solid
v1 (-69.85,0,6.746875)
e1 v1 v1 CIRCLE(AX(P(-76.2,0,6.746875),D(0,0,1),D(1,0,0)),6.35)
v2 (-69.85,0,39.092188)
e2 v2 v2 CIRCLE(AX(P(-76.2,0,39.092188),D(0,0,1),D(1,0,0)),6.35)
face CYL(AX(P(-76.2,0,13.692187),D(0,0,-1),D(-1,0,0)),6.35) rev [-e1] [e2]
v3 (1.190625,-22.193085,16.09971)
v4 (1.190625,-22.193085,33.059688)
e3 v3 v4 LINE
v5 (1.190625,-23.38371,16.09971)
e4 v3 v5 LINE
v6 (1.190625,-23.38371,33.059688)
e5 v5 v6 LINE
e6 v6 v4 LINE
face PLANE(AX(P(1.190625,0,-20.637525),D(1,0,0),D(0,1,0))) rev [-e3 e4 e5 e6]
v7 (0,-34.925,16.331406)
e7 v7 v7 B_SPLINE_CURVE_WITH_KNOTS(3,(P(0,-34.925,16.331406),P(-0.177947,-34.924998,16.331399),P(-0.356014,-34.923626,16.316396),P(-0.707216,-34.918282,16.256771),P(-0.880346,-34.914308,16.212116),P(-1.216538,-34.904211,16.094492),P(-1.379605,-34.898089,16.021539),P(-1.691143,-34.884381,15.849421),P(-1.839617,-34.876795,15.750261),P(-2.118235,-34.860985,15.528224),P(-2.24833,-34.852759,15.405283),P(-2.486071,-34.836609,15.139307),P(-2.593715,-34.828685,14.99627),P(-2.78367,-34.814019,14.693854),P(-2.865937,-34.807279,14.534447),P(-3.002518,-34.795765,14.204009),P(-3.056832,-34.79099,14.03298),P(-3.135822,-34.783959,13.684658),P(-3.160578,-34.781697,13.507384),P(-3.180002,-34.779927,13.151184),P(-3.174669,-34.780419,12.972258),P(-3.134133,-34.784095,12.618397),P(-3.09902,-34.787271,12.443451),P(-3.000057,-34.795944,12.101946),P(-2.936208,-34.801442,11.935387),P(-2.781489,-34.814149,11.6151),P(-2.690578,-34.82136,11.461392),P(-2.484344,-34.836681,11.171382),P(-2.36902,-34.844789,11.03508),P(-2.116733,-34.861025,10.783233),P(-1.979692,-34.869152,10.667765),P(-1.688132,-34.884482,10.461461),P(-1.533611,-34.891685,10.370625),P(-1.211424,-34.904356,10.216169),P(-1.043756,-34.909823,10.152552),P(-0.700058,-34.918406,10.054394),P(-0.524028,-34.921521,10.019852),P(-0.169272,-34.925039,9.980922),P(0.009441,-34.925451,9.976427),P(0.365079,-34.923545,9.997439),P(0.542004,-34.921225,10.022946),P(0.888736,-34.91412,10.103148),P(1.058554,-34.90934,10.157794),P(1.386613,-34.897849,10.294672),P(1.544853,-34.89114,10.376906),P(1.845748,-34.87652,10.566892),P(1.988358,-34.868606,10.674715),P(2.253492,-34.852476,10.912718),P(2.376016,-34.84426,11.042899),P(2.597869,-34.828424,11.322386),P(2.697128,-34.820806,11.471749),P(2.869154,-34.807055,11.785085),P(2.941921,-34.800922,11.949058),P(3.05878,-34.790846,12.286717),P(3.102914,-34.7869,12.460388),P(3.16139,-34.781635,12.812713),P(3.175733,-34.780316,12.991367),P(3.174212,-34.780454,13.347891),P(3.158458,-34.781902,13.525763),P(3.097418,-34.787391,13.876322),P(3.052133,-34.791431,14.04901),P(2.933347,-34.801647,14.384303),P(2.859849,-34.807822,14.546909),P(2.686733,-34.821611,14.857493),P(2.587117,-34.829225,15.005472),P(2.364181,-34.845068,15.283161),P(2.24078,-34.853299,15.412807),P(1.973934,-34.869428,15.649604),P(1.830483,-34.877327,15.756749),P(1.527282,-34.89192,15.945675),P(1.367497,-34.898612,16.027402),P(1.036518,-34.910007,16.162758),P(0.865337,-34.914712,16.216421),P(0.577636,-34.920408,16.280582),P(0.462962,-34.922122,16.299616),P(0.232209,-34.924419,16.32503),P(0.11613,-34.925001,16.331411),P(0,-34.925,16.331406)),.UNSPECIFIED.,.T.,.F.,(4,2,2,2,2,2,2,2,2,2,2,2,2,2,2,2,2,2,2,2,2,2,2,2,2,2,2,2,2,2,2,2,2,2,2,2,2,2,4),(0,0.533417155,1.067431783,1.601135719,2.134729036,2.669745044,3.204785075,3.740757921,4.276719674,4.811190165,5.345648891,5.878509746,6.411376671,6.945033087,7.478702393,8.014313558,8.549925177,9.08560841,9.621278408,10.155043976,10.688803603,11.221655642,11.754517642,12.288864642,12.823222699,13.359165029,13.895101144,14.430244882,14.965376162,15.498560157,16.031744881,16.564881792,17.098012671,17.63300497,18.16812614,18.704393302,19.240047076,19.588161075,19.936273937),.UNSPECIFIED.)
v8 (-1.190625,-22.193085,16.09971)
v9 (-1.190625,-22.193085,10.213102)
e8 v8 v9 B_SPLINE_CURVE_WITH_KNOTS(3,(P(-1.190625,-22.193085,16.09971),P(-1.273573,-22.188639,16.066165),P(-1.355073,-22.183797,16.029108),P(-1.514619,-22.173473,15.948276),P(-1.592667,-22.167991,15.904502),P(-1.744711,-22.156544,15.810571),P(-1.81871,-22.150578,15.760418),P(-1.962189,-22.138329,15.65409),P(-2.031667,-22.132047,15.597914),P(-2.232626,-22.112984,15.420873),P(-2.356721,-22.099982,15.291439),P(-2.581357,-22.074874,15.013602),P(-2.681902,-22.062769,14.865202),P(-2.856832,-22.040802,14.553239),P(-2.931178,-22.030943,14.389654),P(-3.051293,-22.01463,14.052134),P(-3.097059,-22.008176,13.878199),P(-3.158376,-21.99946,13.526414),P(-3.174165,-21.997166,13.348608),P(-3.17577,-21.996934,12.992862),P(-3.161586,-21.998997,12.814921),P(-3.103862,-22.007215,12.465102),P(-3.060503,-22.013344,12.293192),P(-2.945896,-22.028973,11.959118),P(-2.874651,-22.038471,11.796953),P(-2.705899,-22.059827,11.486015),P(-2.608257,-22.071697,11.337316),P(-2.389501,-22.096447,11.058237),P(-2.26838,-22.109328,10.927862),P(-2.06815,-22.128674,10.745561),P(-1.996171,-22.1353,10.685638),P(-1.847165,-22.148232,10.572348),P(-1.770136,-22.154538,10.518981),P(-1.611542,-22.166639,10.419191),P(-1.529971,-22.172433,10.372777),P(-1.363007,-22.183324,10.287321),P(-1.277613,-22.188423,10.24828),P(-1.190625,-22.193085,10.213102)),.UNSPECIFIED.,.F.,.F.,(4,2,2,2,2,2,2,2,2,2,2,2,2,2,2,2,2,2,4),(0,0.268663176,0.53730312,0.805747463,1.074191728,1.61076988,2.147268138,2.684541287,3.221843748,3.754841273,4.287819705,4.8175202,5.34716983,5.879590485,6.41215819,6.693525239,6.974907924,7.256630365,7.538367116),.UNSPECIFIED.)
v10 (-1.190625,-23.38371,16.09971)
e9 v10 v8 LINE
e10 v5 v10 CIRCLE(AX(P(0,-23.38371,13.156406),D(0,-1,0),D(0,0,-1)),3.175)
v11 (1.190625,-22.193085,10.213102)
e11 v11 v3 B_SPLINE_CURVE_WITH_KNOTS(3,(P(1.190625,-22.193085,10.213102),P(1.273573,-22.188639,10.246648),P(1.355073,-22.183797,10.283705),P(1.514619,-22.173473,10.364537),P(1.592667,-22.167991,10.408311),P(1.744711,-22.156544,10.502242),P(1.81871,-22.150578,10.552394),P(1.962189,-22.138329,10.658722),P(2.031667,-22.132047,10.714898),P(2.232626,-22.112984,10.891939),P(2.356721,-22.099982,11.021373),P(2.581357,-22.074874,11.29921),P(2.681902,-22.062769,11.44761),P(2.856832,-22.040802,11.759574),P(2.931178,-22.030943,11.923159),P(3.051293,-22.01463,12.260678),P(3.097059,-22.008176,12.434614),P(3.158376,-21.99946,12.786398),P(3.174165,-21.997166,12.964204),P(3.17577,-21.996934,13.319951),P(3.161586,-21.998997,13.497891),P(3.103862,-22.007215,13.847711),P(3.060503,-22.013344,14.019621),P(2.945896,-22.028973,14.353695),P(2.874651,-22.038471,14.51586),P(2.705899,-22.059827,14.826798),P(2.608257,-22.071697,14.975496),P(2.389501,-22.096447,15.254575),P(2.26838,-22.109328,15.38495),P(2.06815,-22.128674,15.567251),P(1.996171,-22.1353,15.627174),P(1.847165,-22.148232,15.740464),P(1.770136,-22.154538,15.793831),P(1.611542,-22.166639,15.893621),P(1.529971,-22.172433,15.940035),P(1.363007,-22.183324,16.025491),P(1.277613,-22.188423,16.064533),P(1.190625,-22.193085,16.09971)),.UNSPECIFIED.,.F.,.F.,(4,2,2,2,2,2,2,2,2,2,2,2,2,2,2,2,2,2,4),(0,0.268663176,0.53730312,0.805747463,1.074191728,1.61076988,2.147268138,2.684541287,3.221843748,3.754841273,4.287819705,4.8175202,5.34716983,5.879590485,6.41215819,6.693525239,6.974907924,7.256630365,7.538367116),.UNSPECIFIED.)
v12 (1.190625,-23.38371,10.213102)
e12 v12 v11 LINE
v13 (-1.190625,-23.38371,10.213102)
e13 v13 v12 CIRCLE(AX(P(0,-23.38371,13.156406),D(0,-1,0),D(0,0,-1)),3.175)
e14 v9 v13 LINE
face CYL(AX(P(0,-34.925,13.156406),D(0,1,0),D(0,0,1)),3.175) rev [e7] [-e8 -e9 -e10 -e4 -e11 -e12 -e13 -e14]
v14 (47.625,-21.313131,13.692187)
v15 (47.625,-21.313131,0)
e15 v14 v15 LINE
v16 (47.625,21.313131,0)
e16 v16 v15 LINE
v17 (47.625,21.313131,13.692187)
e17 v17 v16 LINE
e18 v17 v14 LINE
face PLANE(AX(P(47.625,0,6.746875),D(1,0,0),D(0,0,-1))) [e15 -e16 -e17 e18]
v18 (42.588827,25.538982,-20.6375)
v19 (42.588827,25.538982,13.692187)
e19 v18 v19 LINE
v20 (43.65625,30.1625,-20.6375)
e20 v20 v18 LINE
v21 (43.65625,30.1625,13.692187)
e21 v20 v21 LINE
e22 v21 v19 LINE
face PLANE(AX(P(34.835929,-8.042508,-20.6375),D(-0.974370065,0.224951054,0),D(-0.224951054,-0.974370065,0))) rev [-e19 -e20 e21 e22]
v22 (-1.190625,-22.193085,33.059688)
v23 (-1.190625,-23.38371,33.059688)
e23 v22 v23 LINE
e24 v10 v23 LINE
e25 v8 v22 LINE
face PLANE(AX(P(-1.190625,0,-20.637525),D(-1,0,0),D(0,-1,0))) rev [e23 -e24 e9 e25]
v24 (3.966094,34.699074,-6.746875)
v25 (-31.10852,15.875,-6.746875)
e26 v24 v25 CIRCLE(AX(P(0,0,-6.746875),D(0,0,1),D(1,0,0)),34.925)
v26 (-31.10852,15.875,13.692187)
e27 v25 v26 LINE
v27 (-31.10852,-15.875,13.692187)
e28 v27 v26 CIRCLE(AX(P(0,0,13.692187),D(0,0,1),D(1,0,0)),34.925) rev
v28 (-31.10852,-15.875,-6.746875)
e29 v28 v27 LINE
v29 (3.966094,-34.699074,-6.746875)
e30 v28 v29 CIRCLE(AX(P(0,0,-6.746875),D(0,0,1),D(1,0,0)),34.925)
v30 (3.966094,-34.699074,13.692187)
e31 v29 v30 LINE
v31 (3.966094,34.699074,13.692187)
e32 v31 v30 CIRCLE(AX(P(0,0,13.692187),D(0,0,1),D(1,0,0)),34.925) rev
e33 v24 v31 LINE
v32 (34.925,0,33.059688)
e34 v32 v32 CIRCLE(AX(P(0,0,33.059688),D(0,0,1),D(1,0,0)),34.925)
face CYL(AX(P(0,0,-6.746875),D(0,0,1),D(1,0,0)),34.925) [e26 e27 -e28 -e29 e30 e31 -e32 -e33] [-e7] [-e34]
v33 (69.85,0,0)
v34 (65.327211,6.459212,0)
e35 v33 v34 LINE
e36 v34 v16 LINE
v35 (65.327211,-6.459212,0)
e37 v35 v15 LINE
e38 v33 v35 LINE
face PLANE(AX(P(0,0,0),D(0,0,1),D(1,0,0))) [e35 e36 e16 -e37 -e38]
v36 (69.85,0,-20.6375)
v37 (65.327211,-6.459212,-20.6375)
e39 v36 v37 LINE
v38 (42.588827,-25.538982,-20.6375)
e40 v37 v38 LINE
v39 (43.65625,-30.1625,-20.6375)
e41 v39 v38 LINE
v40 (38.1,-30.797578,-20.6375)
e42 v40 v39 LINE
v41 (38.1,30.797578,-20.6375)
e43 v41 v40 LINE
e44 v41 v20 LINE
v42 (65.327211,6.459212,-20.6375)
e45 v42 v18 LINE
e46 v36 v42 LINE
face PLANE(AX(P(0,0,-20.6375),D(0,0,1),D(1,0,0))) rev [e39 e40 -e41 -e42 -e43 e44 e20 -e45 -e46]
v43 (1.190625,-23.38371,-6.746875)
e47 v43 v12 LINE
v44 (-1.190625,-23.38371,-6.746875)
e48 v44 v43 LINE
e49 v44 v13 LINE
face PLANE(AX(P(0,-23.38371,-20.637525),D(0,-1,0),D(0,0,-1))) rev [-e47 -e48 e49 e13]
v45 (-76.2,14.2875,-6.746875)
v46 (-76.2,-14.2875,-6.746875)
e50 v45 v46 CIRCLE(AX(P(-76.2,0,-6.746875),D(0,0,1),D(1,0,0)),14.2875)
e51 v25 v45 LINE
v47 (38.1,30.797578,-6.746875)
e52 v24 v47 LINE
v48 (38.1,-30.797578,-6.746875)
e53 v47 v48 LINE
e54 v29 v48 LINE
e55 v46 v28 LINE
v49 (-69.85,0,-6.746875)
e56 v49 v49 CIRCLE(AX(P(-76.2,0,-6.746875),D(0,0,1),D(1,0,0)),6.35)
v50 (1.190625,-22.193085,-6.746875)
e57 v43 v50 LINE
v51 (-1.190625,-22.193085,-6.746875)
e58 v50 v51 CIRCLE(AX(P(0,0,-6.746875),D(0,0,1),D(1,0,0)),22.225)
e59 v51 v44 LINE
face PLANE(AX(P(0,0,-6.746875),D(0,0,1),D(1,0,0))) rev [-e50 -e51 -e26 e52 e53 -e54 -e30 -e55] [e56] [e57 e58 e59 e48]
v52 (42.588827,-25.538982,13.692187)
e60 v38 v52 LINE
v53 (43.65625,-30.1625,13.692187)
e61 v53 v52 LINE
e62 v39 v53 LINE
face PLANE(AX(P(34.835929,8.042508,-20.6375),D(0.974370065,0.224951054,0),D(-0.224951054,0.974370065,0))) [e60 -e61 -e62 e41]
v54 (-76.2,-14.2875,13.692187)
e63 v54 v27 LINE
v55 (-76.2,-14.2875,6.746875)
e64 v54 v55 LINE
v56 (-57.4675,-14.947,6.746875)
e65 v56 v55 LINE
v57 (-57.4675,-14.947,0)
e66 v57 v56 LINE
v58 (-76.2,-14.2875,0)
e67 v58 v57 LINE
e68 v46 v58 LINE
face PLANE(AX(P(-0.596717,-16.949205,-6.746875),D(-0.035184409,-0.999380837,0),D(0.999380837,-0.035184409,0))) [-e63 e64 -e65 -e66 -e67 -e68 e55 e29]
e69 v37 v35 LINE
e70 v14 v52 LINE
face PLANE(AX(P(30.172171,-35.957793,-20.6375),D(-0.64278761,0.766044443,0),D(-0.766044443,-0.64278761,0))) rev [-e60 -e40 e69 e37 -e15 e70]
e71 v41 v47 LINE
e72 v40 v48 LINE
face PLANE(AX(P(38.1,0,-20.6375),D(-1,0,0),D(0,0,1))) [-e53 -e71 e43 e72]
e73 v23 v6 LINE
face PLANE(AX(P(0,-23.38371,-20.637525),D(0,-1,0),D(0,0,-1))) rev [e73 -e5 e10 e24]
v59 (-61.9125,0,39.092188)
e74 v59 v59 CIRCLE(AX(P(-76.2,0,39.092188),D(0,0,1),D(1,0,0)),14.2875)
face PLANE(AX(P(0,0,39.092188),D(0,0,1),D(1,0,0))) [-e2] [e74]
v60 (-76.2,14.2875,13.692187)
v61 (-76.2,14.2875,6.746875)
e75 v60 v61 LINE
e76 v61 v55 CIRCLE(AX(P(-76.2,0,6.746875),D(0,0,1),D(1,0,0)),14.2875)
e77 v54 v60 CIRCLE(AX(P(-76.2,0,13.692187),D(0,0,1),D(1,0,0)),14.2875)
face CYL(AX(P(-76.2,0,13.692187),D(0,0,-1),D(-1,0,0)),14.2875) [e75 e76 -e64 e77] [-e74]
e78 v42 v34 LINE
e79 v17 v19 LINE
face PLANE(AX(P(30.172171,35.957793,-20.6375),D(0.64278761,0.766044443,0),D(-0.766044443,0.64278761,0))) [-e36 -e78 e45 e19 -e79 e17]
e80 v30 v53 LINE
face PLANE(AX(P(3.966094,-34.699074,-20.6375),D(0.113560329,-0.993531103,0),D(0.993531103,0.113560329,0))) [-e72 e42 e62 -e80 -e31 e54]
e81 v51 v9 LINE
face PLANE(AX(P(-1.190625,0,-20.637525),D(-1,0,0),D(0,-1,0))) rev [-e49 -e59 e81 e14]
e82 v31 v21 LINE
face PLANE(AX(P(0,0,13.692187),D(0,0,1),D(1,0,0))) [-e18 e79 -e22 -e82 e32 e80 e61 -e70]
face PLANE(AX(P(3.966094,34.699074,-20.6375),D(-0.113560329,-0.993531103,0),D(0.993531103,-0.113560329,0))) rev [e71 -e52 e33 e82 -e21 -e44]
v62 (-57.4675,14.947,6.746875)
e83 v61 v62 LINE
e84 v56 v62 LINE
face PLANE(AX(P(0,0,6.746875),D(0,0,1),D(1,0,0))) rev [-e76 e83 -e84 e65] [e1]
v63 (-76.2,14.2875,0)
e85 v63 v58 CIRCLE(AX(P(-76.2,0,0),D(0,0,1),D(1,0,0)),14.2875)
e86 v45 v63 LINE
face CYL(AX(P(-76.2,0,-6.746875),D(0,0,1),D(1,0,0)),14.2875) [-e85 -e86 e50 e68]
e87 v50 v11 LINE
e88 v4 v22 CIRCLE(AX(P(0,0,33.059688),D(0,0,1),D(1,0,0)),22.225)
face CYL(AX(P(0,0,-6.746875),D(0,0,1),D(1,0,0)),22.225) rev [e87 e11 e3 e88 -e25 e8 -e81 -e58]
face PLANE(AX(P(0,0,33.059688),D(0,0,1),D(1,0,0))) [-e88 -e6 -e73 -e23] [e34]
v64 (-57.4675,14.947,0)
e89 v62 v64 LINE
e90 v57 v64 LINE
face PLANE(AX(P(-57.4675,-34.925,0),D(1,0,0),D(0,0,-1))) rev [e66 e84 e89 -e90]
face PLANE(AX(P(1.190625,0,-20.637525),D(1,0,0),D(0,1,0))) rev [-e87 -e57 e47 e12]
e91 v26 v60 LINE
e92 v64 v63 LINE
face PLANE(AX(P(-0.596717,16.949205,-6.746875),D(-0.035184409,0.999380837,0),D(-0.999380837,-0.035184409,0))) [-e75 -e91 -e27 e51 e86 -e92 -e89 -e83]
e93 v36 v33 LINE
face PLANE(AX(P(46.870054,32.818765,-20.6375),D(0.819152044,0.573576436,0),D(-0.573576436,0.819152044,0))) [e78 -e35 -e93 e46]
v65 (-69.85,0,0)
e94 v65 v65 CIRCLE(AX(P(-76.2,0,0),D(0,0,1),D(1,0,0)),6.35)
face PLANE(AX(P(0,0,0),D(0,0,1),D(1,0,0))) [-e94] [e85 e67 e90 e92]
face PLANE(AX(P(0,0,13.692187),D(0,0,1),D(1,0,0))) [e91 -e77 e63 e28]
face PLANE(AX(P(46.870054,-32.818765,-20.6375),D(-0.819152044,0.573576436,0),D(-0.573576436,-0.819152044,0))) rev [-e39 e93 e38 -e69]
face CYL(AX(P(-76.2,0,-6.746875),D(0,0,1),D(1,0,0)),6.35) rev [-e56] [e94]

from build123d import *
from OCP.BRepAlgoAPI import BRepAlgoAPI_Cut
from OCP.TopTools import TopTools_ListOfShape

# Parameters (mm, degrees)
BOSS_EXTRUDE7_DEPTH     = 20.6375
SKETCH1_18_R            = 14.2875
SKETCH1_18_R_2          = 6.35
SKETCH1_18_R_3          = 34.925
SKETCH1_18_R_4          = 22.225
BOSS_EXTRUDE10_DEPTH    = 6.746875
BOSS_EXTRUDE11_START    = 6.746875
SKETCH1_20_R            = 34.925
SKETCH1_20_R_2          = 22.225
BOSS_EXTRUDE11_DEPTH    = 6.746875
BOSS_EXTRUDE12_START    = 13.692187
SKETCH1_21_R            = 14.2875
SKETCH1_21_R_2          = 6.35
SKETCH1_21_R_3          = 34.925
SKETCH1_21_R_4          = 22.225
BOSS_EXTRUDE12_DEPTH    = 6.945312
BOSS_EXTRUDE13_START    = 39.09219
SKETCH1_22_R            = 14.2875
SKETCH1_22_R_2          = 6.35
BOSS_EXTRUDE13_DEPTH    = 25.4
BOSS_EXTRUDE14_START    = 13.692187
SKETCH1_23_R            = 34.925
SKETCH1_23_R_2          = 22.225
BOSS_EXTRUDE14_DEPTH    = 19.367501
CUT_EXTRUDE3_DEPTH      = 111.865374
SKETCH5_R               = 3.175
CUT_EXTRUDE4_DEPTH      = 105.575057
CUT_EXTRUDE5_DEPTH      = 105.575057
CUT_EXTRUDE5_DEPTH_BACK = 105.575057
SKETCH6_W               = 33.02
SKETCH6_H               = 6.746875


with BuildPart() as part:
    # Sketch1 → Boss-Extrude7 (new body)
    with BuildSketch(Plane.XY):
        Polygon((38.1, 30.797578), (38.1, -30.797578), (43.65625, -30.1625), (42.588827, -25.538982), (65.327211, -6.459212), (69.85, 0), (65.327211, 6.459212), (42.588827, 25.538982), (43.65625, 30.1625), align=None)
    extrude(amount=-BOSS_EXTRUDE7_DEPTH)

    # Sketch1<18> → Boss-Extrude10 (add)
    # profile 1 of 5: a face of its own
    with BuildSketch(Plane.XY):
        with BuildLine():
            ThreePointArc((34.925, 0), (26.060233, -23.251234), (3.966094, -34.699074))
            Line((3.966094, -34.699074), (38.1, -30.797578))
            Line((38.1, -30.797578), (38.1, 30.797578))
            Line((38.1, 30.797578), (3.966094, 34.699074))
            ThreePointArc((3.966094, 34.699074), (26.060233, 23.251234), (34.925, 0))
        make_face()
    # profile 2 of 5: a face of its own
    with BuildSketch(Plane.XY):
        with BuildLine():
            Line((-55.5625, 15.014068), (-55.5625, -15.014068))
            Line((-55.5625, -15.014068), (-31.10852, -15.875))
            ThreePointArc((-31.10852, -15.875), (-34.925, 0), (-31.10852, 15.875))
            Line((-31.10852, 15.875), (-55.5625, 15.014068))
        make_face()
    # profile 3 of 5: a face of its own
    with BuildSketch(Plane.XY):
        with BuildLine():
            ThreePointArc((-61.9125, 0), (-66.097212, -10.102788), (-76.2, -14.2875))
            Line((-76.2, -14.2875), (-55.5625, -15.014068))
            Line((-55.5625, -15.014068), (-55.5625, 15.014068))
            Line((-55.5625, 15.014068), (-76.2, 14.2875))
            ThreePointArc((-76.2, 14.2875), (-66.097212, 10.102788), (-61.9125, 0))
        make_face()
    # profile 4 of 5: a face of its own
    with BuildSketch(Plane.XY):
        with Locations((-76.2, 0)):
            Circle(SKETCH1_18_R)
        with Locations((-76.2, 0)):
            Circle(SKETCH1_18_R_2, mode=Mode.SUBTRACT)
    # profile 5 of 5: a face of its own
    with BuildSketch(Plane.XY):
        Circle(SKETCH1_18_R_3)
        Circle(SKETCH1_18_R_4, mode=Mode.SUBTRACT)
    extrude(amount=-BOSS_EXTRUDE10_DEPTH)

    # Sketch1<20> → Boss-Extrude11 (add)
    # profile 1 of 5: a face of its own
    with BuildSketch(Plane.XY.offset(BOSS_EXTRUDE11_START)):
        Circle(SKETCH1_20_R)
        Circle(SKETCH1_20_R_2, mode=Mode.SUBTRACT)
    # profile 2 of 5: a face of its own
    with BuildSketch(Plane.XY.offset(BOSS_EXTRUDE11_START)):
        with BuildLine():
            ThreePointArc((34.925, 0), (26.060233, -23.251234), (3.966094, -34.699074))
            Line((3.966094, -34.699074), (38.1, -30.797578))
            Line((38.1, -30.797578), (38.1, 30.797578))
            Line((38.1, 30.797578), (3.966094, 34.699074))
            ThreePointArc((3.966094, 34.699074), (26.060233, 23.251234), (34.925, 0))
        make_face()
    # profile 3 of 5: a face of its own
    with BuildSketch(Plane.XY.offset(BOSS_EXTRUDE11_START)):
        Polygon((38.1, 30.797578), (38.1, -30.797578), (43.65625, -30.1625), (42.588827, -25.538982), (47.625, -21.313131), (47.625, 21.313131), (42.588827, 25.538982), (43.65625, 30.1625), align=None)
    # profile 4 of 5: a face of its own
    with BuildSketch(Plane.XY.offset(BOSS_EXTRUDE11_START)):
        with BuildLine():
            Line((-55.5625, 15.014068), (-55.5625, -15.014068))
            Line((-55.5625, -15.014068), (-31.10852, -15.875))
            ThreePointArc((-31.10852, -15.875), (-34.925, 0), (-31.10852, 15.875))
            Line((-31.10852, 15.875), (-55.5625, 15.014068))
        make_face()
    # profile 5 of 5: a face of its own
    with BuildSketch(Plane.XY.offset(BOSS_EXTRUDE11_START)):
        with BuildLine():
            ThreePointArc((-61.9125, 0), (-66.097212, -10.102788), (-76.2, -14.2875))
            Line((-76.2, -14.2875), (-55.5625, -15.014068))
            Line((-55.5625, -15.014068), (-55.5625, 15.014068))
            Line((-55.5625, 15.014068), (-76.2, 14.2875))
            ThreePointArc((-76.2, 14.2875), (-66.097212, 10.102788), (-61.9125, 0))
        make_face()
    extrude(amount=-BOSS_EXTRUDE11_DEPTH)

    # Sketch1<21> → Boss-Extrude12 (add)
    # profile 1 of 6: a face of its own
    with BuildSketch(Plane.XY.offset(BOSS_EXTRUDE12_START)):
        with Locations((-76.2, 0)):
            Circle(SKETCH1_21_R)
        with Locations((-76.2, 0)):
            Circle(SKETCH1_21_R_2, mode=Mode.SUBTRACT)
    # profile 2 of 6: a face of its own
    with BuildSketch(Plane.XY.offset(BOSS_EXTRUDE12_START)):
        with BuildLine():
            ThreePointArc((-61.9125, 0), (-66.097212, -10.102788), (-76.2, -14.2875))
            Line((-76.2, -14.2875), (-55.5625, -15.014068))
            Line((-55.5625, -15.014068), (-55.5625, 15.014068))
            Line((-55.5625, 15.014068), (-76.2, 14.2875))
            ThreePointArc((-76.2, 14.2875), (-66.097212, 10.102788), (-61.9125, 0))
        make_face()
    # profile 3 of 6: a face of its own
    with BuildSketch(Plane.XY.offset(BOSS_EXTRUDE12_START)):
        with BuildLine():
            Line((-55.5625, 15.014068), (-55.5625, -15.014068))
            Line((-55.5625, -15.014068), (-31.10852, -15.875))
            ThreePointArc((-31.10852, -15.875), (-34.925, 0), (-31.10852, 15.875))
            Line((-31.10852, 15.875), (-55.5625, 15.014068))
        make_face()
    # profile 4 of 6: a face of its own
    with BuildSketch(Plane.XY.offset(BOSS_EXTRUDE12_START)):
        Circle(SKETCH1_21_R_3)
        Circle(SKETCH1_21_R_4, mode=Mode.SUBTRACT)
    # profile 5 of 6: a face of its own
    with BuildSketch(Plane.XY.offset(BOSS_EXTRUDE12_START)):
        with BuildLine():
            ThreePointArc((34.925, 0), (26.060233, -23.251234), (3.966094, -34.699074))
            Line((3.966094, -34.699074), (38.1, -30.797578))
            Line((38.1, -30.797578), (38.1, 30.797578))
            Line((38.1, 30.797578), (3.966094, 34.699074))
            ThreePointArc((3.966094, 34.699074), (26.060233, 23.251234), (34.925, 0))
        make_face()
    # profile 6 of 6: a face of its own
    with BuildSketch(Plane.XY.offset(BOSS_EXTRUDE12_START)):
        Polygon((38.1, 30.797578), (38.1, -30.797578), (43.65625, -30.1625), (42.588827, -25.538982), (47.625, -21.313131), (47.625, 21.313131), (42.588827, 25.538982), (43.65625, 30.1625), align=None)
    extrude(amount=-BOSS_EXTRUDE12_DEPTH)


with BuildPart() as boss_extrude13_tool:
    # Sketch1<22> → Boss-Extrude13 (new body)
    with BuildSketch(Plane.XY.offset(BOSS_EXTRUDE13_START)):
        with Locations(Location((-76.2, 0, 0), (0, 0, 270))):
            Circle(SKETCH1_22_R)
        with Locations((-76.2, 0)):
            Circle(SKETCH1_22_R_2, mode=Mode.SUBTRACT)
    extrude(amount=-BOSS_EXTRUDE13_DEPTH)


with BuildPart() as part_1:
    add(part.part)


with BuildPart() as part_2:
    # Boss-Extrude13: joined with boss_extrude13_tool
    add(part_1.part.fuse(boss_extrude13_tool.part, tol=0.00001))

    # Sketch1<23> → Boss-Extrude14 (add)
    with BuildSketch(Plane.XY.offset(BOSS_EXTRUDE14_START)):
        Circle(SKETCH1_23_R)
        Circle(SKETCH1_23_R_2, mode=Mode.SUBTRACT)
    extrude(amount=BOSS_EXTRUDE14_DEPTH)


with BuildPart() as cut_extrude3_tool:
    # Sketch4 → Cut-Extrude3 (new, through all)
    with BuildSketch(Plane.XY.offset(33.059687)):
        with BuildLine():
            Line((0, -23.38371), (0, -22.225))
            ThreePointArc((0, -22.225), (-0.595526, -22.21702), (-1.190625, -22.193085))
            Line((-1.190625, -22.193085), (-1.190625, -23.38371))
            Line((-1.190625, -23.38371), (0, -23.38371))
        make_face()
        with BuildLine():
            ThreePointArc((1.190625, -22.193085), (0.595526, -22.21702), (0, -22.225))
            Line((0, -22.225), (0, -23.38371))
            Line((0, -23.38371), (1.190625, -23.38371))
            Line((1.190625, -23.38371), (1.190625, -22.193085))
        make_face()
    extrude(amount=-CUT_EXTRUDE3_DEPTH)


with BuildPart() as part_3:
    add(part_2.part)

    # Cut-Extrude3: cut by cut_extrude3_tool, with a tolerance
    cut_extrude3_stock = TopTools_ListOfShape()
    cut_extrude3_stock.Append(part_3.part.wrapped)
    cut_extrude3_tools = TopTools_ListOfShape()
    cut_extrude3_tools.Append(cut_extrude3_tool.part.wrapped)
    cut_extrude3_cut = BRepAlgoAPI_Cut()
    cut_extrude3_cut.SetArguments(cut_extrude3_stock)
    cut_extrude3_cut.SetTools(cut_extrude3_tools)
    cut_extrude3_cut.SetFuzzyValue(0.00001)
    cut_extrude3_cut.Build()
    add(Compound.cast(cut_extrude3_cut.Shape()).solids(), mode=Mode.REPLACE)

    # Sketch5 → Cut-Extrude4 (cut, through all)
    with BuildSketch(Plane(origin=(0, 0, 0), x_dir=(1, 0, 0), z_dir=(0, 1, 0))):
        with Locations(Location((0, -13.156406, 0), (0, 0, 270))):
            Circle(SKETCH5_R)
    extrude(amount=-CUT_EXTRUDE4_DEPTH, mode=Mode.SUBTRACT)

    # Sketch6 → Cut-Extrude5 (cut, two sides: drawn at the far end of the back side and taken through both)
    with BuildSketch(Plane(origin=(0, 0, 0), x_dir=(1, 0, 0), z_dir=(0, 1, 0)).offset(-CUT_EXTRUDE5_DEPTH_BACK)):
        with Locations((-73.9775, -3.373437)):
            Rectangle(SKETCH6_W, SKETCH6_H)
    extrude(amount=CUT_EXTRUDE5_DEPTH + CUT_EXTRUDE5_DEPTH_BACK, mode=Mode.SUBTRACT)


solid = part_3.part
